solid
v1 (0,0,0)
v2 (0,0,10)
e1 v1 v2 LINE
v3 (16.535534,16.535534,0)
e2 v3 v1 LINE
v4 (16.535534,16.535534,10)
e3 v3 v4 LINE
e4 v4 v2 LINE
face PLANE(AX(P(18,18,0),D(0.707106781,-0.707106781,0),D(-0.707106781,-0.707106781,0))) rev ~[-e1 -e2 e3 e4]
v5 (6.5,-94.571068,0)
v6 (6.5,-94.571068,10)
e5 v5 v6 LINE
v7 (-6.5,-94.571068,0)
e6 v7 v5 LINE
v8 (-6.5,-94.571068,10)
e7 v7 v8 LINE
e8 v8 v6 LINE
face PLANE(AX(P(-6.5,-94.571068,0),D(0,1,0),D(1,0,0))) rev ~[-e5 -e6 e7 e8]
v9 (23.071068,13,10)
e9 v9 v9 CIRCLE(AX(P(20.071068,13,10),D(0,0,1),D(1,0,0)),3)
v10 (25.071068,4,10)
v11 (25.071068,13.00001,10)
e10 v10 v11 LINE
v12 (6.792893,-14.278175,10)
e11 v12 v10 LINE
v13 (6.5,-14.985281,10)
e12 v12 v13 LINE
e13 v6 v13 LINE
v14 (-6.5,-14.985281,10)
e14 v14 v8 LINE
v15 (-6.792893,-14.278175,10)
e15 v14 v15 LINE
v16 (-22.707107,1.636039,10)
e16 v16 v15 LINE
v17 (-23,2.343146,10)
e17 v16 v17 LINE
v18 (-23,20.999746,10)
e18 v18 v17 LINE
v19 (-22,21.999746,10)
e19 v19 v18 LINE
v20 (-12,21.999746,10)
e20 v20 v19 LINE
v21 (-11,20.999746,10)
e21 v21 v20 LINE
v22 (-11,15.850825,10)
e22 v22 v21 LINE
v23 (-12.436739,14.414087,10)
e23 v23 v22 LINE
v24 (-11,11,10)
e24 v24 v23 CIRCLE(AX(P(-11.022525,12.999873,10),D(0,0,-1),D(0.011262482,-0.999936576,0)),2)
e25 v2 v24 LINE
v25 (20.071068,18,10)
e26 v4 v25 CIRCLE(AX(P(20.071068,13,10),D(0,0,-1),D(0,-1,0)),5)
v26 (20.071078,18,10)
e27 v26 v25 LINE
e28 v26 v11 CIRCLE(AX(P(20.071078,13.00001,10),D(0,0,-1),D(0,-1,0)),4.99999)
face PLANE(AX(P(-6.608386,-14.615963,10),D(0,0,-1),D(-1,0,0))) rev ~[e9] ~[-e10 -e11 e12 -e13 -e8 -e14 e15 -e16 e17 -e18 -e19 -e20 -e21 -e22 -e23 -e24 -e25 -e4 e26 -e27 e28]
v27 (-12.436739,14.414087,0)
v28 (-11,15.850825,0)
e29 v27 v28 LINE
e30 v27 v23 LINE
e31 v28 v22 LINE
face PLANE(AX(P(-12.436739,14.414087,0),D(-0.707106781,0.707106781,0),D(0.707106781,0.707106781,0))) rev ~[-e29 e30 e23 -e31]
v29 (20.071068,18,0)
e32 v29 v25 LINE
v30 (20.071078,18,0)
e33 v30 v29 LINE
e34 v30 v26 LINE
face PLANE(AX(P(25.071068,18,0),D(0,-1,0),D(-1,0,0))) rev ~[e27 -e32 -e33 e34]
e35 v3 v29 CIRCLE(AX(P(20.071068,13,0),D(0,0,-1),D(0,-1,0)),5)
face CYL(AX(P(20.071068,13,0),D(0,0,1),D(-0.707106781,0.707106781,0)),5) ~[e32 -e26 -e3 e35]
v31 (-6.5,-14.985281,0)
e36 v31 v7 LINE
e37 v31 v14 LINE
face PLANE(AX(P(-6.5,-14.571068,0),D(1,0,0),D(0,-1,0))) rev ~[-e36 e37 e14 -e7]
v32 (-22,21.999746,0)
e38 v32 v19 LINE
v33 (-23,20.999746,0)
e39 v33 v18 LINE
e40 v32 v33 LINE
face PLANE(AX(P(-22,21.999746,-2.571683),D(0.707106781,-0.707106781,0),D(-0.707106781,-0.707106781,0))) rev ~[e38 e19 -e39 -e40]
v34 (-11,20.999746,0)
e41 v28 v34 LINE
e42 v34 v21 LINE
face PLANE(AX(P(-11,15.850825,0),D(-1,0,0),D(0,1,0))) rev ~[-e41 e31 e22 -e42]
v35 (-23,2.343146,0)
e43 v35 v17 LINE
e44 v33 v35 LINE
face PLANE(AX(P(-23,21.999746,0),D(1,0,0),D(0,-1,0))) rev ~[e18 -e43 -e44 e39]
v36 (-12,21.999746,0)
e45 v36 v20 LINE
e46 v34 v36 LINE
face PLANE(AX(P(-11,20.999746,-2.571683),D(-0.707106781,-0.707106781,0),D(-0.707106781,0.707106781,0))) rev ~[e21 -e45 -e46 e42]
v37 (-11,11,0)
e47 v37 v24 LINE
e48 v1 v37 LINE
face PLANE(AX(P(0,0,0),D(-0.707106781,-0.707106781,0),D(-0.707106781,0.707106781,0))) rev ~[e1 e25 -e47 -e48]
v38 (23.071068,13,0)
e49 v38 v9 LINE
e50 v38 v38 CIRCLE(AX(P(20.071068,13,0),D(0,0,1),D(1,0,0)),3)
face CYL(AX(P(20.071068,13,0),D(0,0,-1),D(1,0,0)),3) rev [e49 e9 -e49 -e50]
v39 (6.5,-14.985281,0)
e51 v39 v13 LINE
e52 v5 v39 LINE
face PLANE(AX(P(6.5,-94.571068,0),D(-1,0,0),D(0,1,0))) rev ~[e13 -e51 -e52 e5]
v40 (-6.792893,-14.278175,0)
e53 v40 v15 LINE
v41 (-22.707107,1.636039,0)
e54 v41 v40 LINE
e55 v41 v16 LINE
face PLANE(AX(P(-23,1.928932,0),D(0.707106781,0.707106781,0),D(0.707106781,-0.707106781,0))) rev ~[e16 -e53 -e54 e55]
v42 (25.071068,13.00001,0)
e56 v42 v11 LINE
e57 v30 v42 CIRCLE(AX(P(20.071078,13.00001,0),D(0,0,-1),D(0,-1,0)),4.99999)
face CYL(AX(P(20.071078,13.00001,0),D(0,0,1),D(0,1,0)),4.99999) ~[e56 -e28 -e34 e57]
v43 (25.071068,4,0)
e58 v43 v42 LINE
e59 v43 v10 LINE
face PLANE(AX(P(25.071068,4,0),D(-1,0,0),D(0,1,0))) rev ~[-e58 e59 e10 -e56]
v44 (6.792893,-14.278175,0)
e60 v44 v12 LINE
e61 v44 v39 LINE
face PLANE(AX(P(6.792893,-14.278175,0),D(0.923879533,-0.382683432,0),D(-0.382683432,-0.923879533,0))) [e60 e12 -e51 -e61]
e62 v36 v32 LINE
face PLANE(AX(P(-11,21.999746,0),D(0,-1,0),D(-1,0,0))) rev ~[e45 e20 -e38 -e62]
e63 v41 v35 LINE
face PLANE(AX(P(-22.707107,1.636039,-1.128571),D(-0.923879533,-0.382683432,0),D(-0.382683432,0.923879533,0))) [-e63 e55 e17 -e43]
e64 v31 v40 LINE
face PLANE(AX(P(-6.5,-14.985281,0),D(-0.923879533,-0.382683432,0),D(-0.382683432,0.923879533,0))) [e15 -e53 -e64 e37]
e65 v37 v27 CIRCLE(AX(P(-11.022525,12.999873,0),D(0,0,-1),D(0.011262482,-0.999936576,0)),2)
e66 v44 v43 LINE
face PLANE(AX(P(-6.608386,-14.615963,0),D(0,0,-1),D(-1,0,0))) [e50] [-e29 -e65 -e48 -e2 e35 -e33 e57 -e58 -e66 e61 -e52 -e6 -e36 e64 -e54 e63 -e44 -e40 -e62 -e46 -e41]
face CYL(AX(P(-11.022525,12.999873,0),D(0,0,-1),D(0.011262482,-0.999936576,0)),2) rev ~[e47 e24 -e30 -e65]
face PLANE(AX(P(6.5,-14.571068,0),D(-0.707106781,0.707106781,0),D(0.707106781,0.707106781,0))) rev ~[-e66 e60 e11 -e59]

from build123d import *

# Parameters (mm, degrees)
F0_R        = 3
F1_DEPTH    = 10
F2_R        = 5
F3_R        = 4.99999
F4_T1_DEPTH = 10
F4_T3_DEPTH = 15.1433659759
F4_T5_DEPTH = 12.2571417204


# Not quite as in the source:
# - a fillet or chamfer that OpenCascade refuses, or shapes differently, is made with other operations: its cross-section is extruded or revolved along the edge and cut away or added
# - a fillet or chamfer is up to 0.001 mm smaller than in the source, because OpenCascade refuses the exact size


with BuildPart() as f1:
    # F0 (on Top) → F1 (new body)
    with BuildSketch(Plane.XY):
        with BuildLine():
            Line((18, 18), (0, 0))
            Line((0, 0), (-11, 11))
            ThreePointArc((-11, 11), (-12.8659446975, 12.2241130817), (-12.4367385267, 14.4140867148))
            Line((-12.4367385267, 14.4140867148), (-11, 15.8508252416))
            Line((-11, 15.8508252416), (-11, 21.9997463049))
            Line((-11, 21.9997463049), (-23, 21.9997463049))
            Line((-23, 21.9997463049), (-23, 1.9289321881))
            Line((-23, 1.9289321881), (-6.5, -14.5710678119))
            Line((-6.5, -14.5710678119), (-6.5, -94.5710678119))
            Line((-6.5, -94.5710678119), (6.5, -94.5710678119))
            Line((6.5, -94.5710678119), (6.5, -14.5710678119))
            Line((6.5, -14.5710678119), (25.0710678119, 4))
            Line((25.0710678119, 4), (25.0710678119, 18))
            Line((25.0710678119, 18), (18, 18))
        make_face()
        with Locations((20.0710678119, 13)):
            Circle(F0_R, mode=Mode.SUBTRACT)
    extrude(amount=F1_DEPTH)

    # F2
    f2_edges = [f1.edges().sort_by_distance(p)[0] for p in [
        (18, 18, 5),
    ]]
    fillet(f2_edges, radius=F2_R)

    # F3 (radius 5 in the source; OpenCascade refuses exactly that, so slightly less here)
    f3_edges = [f1.edges().sort_by_distance(p)[0] for p in [
        (25.071068, 18, 5),
    ]]
    fillet(f3_edges, radius=F3_R)

    # F4: chamfer of 1 on 5 edges, made by hand

    # F4_s2 → F4_t1 (join)
    with BuildSketch(Plane.XY):
        Polygon((-6.5, -14.9852813742), (-6.7928932188, -14.2781745931), (-6.5, -14.5710678119), align=None)
        Polygon((6.7928932188, -14.2781745931), (6.5, -14.9852813742), (6.5, -14.5710678119), align=None)
    extrude(amount=F4_T1_DEPTH)

    # F4_s4 → F4_t3 (cut)
    with BuildSketch(Plane.XY.offset(-2.571682988)):
        Polygon((-11, 20.9997463049), (-12, 21.9997463049), (-11, 21.9997463049), align=None)
        Polygon((-22, 21.9997463049), (-23, 20.9997463049), (-23, 21.9997463049), align=None)
    extrude(amount=F4_T3_DEPTH, mode=Mode.SUBTRACT)

    # F4_s6 → F4_t5 (cut)
    with BuildSketch(Plane.XY.offset(-1.1285708602)):
        Polygon((-22.7071067812, 1.6360389693), (-23, 2.3431457505), (-23, 1.9289321881), align=None)
    extrude(amount=F4_T5_DEPTH, mode=Mode.SUBTRACT)


solid = f1.part
